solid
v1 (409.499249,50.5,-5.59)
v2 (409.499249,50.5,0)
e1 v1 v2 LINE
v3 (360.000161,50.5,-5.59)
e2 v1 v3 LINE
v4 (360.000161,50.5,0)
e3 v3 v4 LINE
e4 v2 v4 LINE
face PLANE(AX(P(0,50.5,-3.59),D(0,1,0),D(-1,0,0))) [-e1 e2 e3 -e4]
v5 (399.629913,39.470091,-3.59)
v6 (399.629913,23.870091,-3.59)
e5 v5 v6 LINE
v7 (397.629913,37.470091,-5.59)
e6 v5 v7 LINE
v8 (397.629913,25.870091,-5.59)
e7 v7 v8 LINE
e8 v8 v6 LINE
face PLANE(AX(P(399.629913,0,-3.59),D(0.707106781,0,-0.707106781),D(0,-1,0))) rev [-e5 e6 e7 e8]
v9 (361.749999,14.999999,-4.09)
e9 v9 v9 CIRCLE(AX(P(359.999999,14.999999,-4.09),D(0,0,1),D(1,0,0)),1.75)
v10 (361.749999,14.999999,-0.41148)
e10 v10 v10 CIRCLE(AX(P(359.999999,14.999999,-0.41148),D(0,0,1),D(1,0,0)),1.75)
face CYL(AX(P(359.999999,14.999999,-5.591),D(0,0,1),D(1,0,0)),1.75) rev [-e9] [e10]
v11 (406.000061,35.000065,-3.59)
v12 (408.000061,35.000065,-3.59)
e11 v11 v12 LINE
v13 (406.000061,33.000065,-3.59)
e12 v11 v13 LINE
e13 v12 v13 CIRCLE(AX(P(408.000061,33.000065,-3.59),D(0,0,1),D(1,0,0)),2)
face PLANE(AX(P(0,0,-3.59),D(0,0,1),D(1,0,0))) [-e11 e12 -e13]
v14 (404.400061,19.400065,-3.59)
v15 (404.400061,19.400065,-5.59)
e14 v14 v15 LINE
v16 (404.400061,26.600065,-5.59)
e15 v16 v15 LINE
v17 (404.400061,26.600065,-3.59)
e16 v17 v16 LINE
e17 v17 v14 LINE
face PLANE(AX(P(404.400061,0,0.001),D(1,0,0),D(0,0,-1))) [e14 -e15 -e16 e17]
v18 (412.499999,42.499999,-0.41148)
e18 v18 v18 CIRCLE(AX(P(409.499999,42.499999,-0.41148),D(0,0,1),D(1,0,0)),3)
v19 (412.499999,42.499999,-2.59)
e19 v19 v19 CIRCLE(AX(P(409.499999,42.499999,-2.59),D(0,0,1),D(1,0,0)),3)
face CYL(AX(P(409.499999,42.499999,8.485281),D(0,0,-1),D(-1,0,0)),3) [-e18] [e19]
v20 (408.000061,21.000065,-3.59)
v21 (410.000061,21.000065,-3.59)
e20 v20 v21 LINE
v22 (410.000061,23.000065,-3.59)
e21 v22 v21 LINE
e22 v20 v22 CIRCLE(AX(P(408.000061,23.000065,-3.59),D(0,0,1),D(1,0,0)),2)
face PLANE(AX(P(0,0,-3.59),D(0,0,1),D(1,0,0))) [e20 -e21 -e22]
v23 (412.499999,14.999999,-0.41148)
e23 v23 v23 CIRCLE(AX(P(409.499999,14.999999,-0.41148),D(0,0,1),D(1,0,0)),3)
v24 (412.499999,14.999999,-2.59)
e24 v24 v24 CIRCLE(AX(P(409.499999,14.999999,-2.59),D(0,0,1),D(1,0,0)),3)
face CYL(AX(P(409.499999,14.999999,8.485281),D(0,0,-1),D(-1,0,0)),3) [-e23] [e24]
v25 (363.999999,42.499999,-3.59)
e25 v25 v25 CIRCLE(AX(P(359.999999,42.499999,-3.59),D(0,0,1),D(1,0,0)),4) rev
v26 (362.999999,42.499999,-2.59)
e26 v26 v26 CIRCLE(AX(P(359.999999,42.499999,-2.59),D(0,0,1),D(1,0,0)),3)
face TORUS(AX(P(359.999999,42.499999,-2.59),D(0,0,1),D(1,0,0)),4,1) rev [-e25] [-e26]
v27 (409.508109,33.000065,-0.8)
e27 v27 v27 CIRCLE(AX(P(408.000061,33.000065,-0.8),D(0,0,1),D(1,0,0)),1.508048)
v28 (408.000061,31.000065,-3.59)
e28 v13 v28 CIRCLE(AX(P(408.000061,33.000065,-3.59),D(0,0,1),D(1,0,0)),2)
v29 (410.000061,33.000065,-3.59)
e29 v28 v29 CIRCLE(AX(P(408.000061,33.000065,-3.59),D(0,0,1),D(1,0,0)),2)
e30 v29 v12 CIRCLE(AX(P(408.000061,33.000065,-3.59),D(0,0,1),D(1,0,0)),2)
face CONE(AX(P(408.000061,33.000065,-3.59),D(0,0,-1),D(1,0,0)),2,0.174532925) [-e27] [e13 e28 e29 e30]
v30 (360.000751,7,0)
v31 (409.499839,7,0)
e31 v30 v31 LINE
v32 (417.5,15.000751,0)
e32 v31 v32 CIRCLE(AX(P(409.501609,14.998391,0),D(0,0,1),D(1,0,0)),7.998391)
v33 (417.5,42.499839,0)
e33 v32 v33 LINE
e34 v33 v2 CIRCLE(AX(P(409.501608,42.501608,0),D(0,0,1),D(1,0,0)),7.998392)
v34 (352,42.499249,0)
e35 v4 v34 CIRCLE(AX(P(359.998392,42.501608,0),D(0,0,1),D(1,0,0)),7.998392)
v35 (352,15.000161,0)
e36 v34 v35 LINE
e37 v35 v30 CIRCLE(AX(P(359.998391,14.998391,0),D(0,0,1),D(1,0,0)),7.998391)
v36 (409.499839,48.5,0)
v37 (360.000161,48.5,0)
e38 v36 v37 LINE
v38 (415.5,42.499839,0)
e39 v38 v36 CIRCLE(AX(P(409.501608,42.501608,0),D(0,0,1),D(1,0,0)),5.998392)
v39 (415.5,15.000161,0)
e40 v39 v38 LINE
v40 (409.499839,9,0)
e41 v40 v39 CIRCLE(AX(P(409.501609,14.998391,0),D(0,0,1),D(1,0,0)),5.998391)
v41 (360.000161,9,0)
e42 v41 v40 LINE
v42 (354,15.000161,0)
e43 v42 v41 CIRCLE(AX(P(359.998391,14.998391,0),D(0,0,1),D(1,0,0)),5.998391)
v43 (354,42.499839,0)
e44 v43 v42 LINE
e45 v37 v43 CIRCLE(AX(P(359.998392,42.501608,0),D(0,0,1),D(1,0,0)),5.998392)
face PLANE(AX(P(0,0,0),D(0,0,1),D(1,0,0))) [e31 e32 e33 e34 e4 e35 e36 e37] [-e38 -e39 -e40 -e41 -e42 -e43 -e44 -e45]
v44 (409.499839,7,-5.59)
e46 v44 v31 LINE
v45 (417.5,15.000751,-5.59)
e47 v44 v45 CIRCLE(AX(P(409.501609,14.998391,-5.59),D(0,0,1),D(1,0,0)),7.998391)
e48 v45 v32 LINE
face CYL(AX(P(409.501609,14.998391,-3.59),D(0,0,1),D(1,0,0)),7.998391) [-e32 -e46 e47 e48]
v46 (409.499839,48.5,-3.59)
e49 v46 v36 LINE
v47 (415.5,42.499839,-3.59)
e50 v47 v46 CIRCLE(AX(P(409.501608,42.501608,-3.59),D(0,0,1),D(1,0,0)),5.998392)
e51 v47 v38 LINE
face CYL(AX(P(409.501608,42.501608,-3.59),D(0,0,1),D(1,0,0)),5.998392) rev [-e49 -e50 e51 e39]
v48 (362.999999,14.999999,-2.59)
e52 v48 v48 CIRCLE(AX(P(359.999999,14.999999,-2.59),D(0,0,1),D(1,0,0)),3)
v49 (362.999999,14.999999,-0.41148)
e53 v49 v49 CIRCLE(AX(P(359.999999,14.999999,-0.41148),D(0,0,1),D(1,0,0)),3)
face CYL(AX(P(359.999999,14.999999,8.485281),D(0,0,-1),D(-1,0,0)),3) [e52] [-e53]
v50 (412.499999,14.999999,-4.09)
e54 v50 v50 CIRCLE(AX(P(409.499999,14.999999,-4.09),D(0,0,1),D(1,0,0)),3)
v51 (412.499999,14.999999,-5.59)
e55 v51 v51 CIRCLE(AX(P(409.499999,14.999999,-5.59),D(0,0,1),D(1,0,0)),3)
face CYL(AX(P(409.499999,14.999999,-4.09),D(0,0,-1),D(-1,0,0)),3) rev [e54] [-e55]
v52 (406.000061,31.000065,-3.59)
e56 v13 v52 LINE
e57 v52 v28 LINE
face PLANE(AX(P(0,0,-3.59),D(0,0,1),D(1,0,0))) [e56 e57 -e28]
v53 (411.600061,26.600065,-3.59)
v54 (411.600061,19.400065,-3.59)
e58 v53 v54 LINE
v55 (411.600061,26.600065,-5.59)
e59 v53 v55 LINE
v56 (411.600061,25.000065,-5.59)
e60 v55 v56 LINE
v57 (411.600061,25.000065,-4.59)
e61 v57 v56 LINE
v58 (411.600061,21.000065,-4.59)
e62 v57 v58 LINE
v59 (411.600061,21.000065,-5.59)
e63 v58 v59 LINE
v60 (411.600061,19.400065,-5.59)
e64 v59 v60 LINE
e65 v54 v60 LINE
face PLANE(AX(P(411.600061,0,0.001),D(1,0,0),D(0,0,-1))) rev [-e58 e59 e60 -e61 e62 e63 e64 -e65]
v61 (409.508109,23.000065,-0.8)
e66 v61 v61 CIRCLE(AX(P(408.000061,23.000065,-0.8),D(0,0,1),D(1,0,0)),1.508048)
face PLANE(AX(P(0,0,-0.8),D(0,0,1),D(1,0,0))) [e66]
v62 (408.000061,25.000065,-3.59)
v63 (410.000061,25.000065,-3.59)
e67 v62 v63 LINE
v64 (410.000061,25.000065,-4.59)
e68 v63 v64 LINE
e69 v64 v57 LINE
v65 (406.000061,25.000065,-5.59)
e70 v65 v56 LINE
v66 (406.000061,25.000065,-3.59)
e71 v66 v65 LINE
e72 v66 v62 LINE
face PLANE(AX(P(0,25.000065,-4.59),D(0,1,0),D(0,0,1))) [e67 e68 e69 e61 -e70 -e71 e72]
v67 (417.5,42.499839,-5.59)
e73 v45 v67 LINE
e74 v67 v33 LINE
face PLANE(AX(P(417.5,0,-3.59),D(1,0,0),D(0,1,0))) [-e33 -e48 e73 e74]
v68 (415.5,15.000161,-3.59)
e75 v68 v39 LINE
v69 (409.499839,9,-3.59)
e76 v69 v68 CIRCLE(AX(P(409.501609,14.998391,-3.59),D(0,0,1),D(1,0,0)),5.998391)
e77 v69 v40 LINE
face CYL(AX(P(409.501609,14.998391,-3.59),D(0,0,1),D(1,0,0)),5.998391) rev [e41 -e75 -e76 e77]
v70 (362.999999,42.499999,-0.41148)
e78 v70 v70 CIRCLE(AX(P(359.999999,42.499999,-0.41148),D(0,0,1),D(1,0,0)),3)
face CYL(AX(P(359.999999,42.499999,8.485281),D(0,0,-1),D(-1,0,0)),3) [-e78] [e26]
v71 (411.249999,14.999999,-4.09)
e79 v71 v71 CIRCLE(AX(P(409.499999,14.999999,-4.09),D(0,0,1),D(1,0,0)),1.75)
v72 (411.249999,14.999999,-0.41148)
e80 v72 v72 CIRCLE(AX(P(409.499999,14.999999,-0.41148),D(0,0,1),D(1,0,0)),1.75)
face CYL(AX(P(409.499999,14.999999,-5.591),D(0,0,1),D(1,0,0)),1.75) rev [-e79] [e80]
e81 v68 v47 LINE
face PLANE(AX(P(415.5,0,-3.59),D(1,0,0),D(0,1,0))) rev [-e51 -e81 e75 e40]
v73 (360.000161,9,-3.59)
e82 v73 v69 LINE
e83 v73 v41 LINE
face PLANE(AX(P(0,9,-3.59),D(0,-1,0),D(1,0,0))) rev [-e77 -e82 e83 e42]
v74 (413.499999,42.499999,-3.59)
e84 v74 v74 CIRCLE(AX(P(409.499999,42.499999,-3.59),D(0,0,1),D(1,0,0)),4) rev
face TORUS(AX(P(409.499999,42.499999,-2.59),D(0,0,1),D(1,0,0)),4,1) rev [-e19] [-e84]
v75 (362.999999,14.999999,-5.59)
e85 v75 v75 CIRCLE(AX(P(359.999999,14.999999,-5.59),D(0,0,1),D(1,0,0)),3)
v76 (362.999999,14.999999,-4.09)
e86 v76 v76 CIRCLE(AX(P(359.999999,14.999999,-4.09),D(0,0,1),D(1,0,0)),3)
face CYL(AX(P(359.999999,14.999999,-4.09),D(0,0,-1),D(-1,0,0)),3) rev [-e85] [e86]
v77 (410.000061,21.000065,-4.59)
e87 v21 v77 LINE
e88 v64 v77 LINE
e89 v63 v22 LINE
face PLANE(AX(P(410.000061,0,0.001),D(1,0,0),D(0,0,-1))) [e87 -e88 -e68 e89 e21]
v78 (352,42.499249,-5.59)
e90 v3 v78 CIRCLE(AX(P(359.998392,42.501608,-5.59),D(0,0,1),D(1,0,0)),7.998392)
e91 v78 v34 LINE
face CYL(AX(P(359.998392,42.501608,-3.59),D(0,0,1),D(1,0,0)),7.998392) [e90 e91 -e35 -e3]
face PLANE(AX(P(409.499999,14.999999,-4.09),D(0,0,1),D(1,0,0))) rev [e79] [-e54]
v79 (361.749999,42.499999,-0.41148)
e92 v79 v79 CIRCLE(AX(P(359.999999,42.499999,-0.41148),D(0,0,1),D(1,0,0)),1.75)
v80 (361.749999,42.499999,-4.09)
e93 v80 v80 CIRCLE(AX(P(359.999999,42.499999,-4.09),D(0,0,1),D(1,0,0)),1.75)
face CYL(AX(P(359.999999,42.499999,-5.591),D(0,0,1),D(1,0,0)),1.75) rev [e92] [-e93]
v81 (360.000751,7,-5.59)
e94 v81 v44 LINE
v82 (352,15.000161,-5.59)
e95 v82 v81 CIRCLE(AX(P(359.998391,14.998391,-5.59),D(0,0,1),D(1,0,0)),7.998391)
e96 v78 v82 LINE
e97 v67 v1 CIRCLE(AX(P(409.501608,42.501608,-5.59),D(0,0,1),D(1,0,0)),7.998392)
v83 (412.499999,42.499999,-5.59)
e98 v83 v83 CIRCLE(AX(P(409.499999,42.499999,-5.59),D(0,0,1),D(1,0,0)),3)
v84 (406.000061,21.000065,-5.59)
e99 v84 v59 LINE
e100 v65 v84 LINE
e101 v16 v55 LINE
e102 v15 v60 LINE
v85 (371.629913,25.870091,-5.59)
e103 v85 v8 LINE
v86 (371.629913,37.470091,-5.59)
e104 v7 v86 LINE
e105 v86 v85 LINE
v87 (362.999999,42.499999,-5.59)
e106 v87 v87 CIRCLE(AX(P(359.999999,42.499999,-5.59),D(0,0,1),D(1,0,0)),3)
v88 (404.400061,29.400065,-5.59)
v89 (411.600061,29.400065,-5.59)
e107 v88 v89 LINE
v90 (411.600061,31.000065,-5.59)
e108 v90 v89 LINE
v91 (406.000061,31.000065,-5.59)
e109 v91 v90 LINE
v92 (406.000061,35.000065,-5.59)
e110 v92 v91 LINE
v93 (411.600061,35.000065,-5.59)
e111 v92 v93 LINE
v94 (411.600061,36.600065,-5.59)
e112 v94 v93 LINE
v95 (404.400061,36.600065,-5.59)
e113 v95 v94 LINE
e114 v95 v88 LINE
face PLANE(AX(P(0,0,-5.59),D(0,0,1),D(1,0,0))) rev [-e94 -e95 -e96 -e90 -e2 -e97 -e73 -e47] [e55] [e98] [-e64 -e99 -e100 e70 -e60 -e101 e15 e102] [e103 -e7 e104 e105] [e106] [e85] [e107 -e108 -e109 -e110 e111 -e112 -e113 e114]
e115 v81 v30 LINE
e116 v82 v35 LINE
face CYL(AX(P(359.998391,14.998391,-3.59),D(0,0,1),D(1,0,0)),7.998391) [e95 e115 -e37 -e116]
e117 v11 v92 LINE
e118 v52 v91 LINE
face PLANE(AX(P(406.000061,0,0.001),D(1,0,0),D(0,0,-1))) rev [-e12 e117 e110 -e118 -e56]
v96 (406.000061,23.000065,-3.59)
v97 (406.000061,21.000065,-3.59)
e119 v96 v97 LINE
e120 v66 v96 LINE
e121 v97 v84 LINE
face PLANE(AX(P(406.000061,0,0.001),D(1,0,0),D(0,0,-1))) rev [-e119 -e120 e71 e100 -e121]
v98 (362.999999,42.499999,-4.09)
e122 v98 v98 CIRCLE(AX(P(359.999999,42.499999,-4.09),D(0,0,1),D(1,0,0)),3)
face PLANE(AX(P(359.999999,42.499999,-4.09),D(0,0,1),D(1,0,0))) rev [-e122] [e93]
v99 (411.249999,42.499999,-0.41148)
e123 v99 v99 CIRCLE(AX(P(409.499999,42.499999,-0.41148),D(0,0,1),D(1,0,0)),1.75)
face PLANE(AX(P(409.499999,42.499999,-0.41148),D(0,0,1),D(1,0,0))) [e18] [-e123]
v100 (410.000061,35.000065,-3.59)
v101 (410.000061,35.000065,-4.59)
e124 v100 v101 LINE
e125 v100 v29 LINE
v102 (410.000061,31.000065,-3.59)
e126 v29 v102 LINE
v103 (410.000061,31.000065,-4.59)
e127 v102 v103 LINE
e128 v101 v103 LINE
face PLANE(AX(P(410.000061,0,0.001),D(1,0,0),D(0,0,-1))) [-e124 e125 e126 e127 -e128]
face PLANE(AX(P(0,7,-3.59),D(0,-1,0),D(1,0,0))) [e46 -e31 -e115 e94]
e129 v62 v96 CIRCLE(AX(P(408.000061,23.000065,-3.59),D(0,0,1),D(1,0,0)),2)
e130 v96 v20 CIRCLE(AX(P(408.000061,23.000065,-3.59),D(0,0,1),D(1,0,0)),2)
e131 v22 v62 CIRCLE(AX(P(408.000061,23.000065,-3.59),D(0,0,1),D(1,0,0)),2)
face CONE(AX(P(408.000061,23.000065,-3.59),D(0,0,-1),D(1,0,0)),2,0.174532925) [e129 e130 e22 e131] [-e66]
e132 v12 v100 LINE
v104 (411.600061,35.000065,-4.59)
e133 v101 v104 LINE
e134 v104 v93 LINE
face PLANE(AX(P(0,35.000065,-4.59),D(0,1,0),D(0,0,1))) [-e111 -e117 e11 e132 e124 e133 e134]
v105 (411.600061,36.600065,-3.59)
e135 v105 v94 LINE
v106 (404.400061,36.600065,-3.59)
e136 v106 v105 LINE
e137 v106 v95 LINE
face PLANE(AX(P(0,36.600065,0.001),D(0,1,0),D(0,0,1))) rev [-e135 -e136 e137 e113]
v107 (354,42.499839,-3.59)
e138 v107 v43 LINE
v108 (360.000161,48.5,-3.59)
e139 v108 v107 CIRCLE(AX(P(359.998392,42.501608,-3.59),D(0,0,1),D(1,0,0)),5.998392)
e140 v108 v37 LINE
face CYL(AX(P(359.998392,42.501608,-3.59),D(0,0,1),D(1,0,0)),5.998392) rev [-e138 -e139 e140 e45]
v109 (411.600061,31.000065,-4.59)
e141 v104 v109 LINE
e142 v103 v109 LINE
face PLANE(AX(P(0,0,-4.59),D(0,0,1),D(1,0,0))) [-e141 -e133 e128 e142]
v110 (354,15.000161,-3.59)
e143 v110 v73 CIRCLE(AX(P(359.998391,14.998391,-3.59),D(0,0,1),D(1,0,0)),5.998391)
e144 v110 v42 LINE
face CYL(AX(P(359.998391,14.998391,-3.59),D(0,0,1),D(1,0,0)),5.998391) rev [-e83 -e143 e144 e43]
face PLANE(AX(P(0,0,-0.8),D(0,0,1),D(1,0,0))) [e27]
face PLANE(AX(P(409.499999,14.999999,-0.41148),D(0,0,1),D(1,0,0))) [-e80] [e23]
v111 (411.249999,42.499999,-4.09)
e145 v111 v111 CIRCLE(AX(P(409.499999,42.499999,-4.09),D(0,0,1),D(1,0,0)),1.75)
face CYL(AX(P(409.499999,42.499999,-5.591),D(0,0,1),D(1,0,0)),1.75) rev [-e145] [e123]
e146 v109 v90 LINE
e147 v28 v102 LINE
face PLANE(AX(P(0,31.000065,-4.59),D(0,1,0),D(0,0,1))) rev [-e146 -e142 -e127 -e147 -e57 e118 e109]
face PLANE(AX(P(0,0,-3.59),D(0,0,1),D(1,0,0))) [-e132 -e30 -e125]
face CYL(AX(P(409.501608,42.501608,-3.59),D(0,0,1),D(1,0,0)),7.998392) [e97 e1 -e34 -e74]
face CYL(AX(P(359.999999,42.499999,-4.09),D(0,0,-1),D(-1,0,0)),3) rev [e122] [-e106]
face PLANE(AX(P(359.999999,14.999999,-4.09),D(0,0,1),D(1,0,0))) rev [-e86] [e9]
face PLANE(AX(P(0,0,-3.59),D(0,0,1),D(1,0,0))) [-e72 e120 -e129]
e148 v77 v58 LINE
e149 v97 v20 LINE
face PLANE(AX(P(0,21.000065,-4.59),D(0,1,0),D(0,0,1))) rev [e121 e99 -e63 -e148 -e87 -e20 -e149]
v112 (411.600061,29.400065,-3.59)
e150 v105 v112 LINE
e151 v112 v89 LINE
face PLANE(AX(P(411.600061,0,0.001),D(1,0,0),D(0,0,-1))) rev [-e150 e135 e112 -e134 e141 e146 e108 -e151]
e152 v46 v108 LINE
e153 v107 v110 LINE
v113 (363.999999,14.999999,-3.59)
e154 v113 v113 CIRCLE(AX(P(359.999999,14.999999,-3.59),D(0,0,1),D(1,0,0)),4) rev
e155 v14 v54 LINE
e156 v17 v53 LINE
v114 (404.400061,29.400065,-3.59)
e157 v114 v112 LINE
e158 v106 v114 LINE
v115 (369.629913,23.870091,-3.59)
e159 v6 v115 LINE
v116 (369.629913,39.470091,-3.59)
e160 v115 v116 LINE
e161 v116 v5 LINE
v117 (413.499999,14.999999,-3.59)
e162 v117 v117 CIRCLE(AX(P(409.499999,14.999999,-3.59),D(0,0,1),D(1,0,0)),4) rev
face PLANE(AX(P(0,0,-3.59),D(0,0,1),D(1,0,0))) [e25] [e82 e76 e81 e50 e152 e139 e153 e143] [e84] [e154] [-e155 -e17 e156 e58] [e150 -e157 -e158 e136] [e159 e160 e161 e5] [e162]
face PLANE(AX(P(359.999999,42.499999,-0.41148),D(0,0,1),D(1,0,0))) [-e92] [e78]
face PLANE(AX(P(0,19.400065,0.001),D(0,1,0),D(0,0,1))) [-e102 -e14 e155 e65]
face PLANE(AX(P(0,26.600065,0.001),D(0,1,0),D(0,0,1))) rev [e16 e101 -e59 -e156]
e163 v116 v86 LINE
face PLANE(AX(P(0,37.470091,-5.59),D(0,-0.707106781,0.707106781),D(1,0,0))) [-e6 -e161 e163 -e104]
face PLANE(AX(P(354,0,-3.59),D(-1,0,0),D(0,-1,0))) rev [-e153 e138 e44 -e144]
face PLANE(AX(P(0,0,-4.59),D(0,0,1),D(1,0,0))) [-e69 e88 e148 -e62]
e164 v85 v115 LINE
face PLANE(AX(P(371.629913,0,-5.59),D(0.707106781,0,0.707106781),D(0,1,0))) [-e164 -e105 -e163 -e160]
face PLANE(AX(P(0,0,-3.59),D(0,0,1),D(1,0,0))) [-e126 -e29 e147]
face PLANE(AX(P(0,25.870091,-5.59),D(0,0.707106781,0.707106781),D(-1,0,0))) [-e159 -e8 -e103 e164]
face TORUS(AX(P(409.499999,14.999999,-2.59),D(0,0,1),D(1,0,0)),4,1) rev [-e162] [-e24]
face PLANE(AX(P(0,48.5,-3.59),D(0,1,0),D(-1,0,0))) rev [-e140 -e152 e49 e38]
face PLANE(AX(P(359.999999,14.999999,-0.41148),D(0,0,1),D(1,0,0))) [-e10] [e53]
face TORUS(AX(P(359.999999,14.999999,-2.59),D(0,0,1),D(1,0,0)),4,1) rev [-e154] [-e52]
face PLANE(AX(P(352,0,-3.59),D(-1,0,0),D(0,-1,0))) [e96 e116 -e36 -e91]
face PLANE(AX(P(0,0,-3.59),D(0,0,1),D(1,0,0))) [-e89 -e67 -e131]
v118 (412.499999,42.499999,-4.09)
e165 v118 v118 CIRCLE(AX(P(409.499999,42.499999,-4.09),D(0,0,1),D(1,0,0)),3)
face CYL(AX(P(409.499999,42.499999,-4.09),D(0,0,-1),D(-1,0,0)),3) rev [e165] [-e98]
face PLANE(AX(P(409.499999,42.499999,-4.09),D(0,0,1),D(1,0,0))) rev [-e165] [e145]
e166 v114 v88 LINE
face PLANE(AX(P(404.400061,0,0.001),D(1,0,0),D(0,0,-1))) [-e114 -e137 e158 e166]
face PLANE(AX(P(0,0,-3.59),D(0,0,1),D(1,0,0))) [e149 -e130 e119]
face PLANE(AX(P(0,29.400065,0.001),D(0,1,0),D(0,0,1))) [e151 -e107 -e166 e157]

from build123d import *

# Parameters (mm, degrees)
BOSS_EXTRUDE1_DEPTH       = 3.59
SHELL1_T                  = 2
CUT_EXTRUDE2_START        = -3.59
SKETCH6_W                 = 26
SKETCH6_H                 = 11.6
CUT_EXTRUDE2_DEPTH        = 417.990251938
CUT_EXTRUDE3_REACH        = 422.58
SKETCH4_R                 = 1.75
BOSS_EXTRUDE2_START       = -0.8
SKETCH4_3_R               = 3
SKETCH4_3_R_2             = 1.75
BOSS_EXTRUDE2_DEPTH       = 4.79
BOSS_EXTRUDE3_START       = -0.41148
SKETCH4_4_R               = 3
SKETCH4_4_R_2             = 1.75
BOSS_EXTRUDE3_DEPTH       = 5.17852
CHAMFER1_SIZE             = 2
CUT_EXTRUDE4_START        = -5.59
CUT_EXTRUDE4_DEPTH        = 2
BOSS_EXTRUDE4_START       = -5.59
BOSS_EXTRUDE4_DEPTH       = 1
BOSS_EXTRUDE5_OUTLINE_R   = 1.508047724
BOSS_EXTRUDE5_DEPTH       = 2.79
BOSS_EXTRUDE5_DRAFT       = 10
BOSS_EXTRUDE5_2_OUTLINE_R = 1.508047724
BOSS_EXTRUDE5_2_DEPTH     = 2.79
BOSS_EXTRUDE5_2_DRAFT     = 10
CUT_EXTRUDE7_START        = -5.59
SKETCH4_5_R               = 3
CUT_EXTRUDE7_DEPTH        = 1.5
FILLET2_R                 = 1


# Read off the part's stored shape, not the designer's step: Boss-Extrude5
with BuildPart() as part:
    # Sketch3 → Boss-Extrude1 (new body)
    # profile 1 of 2: a face of its own
    with BuildSketch(Plane.XY):
        with BuildLine():
            Line((409.499839162, 48.499999974), (360.000160838, 48.499999974))
            ThreePointArc((360.000160838, 48.499999974), (355.756888215, 46.743111785), (354.000000026, 42.499839162))
            Line((354.000000026, 42.499839162), (354.000000026, 15.000161001))
            ThreePointArc((354.000000026, 15.000161001), (355.756887739, 10.756887739), (360.000161001, 9.000000026))
            Line((360.000161001, 9.000000026), (409.499838999, 9.000000026))
            ThreePointArc((409.499838999, 9.000000026), (413.743112261, 10.756887739), (415.499999974, 15.000161001))
            Line((415.499999974, 15.000161001), (415.499999974, 42.499839162))
            ThreePointArc((415.499999974, 42.499839162), (413.743111785, 46.743111785), (409.499839162, 48.499999974))
        make_face()
        with BuildLine():
            ThreePointArc((360, 47.5), (356.46399498, 46.03600502), (355, 42.5))
            Line((355, 42.5), (355, 15))
            ThreePointArc((355, 15), (356.463994503, 11.463994503), (360, 10))
            Line((360, 10), (409.5, 10))
            ThreePointArc((409.5, 10), (413.036005497, 11.463994503), (414.5, 15))
            Line((414.5, 15), (414.5, 42.5))
            ThreePointArc((414.5, 42.5), (413.03600502, 46.03600502), (409.5, 47.5))
            Line((409.5, 47.5), (360, 47.5))
        make_face(mode=Mode.SUBTRACT)
    # profile 2 of 2: a face of its own
    with BuildSketch(Plane.XY):
        with BuildLine():
            Line((409.5, 47.5), (360, 47.5))
            ThreePointArc((360, 47.5), (356.46399498, 46.03600502), (355, 42.5))
            Line((355, 42.5), (355, 15))
            ThreePointArc((355, 15), (356.463994503, 11.463994503), (360, 10))
            Line((360, 10), (409.5, 10))
            ThreePointArc((409.5, 10), (413.036005497, 11.463994503), (414.5, 15))
            Line((414.5, 15), (414.5, 42.5))
            ThreePointArc((414.5, 42.5), (413.03600502, 46.03600502), (409.5, 47.5))
        make_face()
    extrude(amount=-BOSS_EXTRUDE1_DEPTH)

    # Shell1
    shell1_openings = [part.faces().sort_by_distance(p)[0] for p in [
        (384.75, 28.749999938, 0),
    ]]
    offset(amount=SHELL1_T, openings=shell1_openings, kind=Kind.INTERSECTION)

    # Sketch6 → Cut-Extrude2 (cut, through all)
    with BuildSketch(Plane.XY.offset(CUT_EXTRUDE2_START)):
        with Locations((384.62991333, 31.670090703)):
            Rectangle(SKETCH6_W, SKETCH6_H)
    extrude(amount=-CUT_EXTRUDE2_DEPTH, mode=Mode.SUBTRACT)

    # Sketch4 → Cut-Extrude3 (cut, up to next)
    with BuildSketch(Plane.XY, mode=Mode.PRIVATE) as cut_extrude3_sk1:
        with Locations((409.49999888, 42.49999882)):
            Circle(SKETCH4_R)
    cut_extrude3_tool1 = extrude(cut_extrude3_sk1.sketch, amount=-CUT_EXTRUDE3_REACH, mode=Mode.PRIVATE) & part.part
    # Sketch4 → Cut-Extrude3 (cut, up to next)
    with BuildSketch(Plane.XY, mode=Mode.PRIVATE) as cut_extrude3_sk2:
        with Locations((359.99999888, 42.49999882)):
            Circle(SKETCH4_R)
    cut_extrude3_tool2 = extrude(cut_extrude3_sk2.sketch, amount=-CUT_EXTRUDE3_REACH, mode=Mode.PRIVATE) & part.part
    # Sketch4 → Cut-Extrude3 (cut, up to next)
    with BuildSketch(Plane.XY, mode=Mode.PRIVATE) as cut_extrude3_sk3:
        with Locations((359.99999888, 14.99999882)):
            Circle(SKETCH4_R)
    cut_extrude3_tool3 = extrude(cut_extrude3_sk3.sketch, amount=-CUT_EXTRUDE3_REACH, mode=Mode.PRIVATE) & part.part
    # Sketch4 → Cut-Extrude3 (cut, up to next)
    with BuildSketch(Plane.XY, mode=Mode.PRIVATE) as cut_extrude3_sk4:
        with Locations((409.49999888, 14.99999882)):
            Circle(SKETCH4_R)
    cut_extrude3_tool4 = extrude(cut_extrude3_sk4.sketch, amount=-CUT_EXTRUDE3_REACH, mode=Mode.PRIVATE) & part.part
    add(cut_extrude3_tool1.solids().sort_by_distance((409.499999, 42.499999, 0))[0], mode=Mode.SUBTRACT)
    add(cut_extrude3_tool2.solids().sort_by_distance((359.999999, 42.499999, 0))[0], mode=Mode.SUBTRACT)
    add(cut_extrude3_tool3.solids().sort_by_distance((359.999999, 14.999999, 0))[0], mode=Mode.SUBTRACT)
    add(cut_extrude3_tool4.solids().sort_by_distance((409.499999, 14.999999, 0))[0], mode=Mode.SUBTRACT)

    # Sketch4<3> → Boss-Extrude2 (add)
    # profile 1 of 4: a face of its own
    with BuildSketch(Plane.XY.offset(BOSS_EXTRUDE2_START)):
        with Locations((409.49999888, 42.49999882)):
            Circle(SKETCH4_3_R)
        with Locations((409.49999888, 42.49999882)):
            Circle(SKETCH4_3_R_2, mode=Mode.SUBTRACT)
    # profile 2 of 4: a face of its own
    with BuildSketch(Plane.XY.offset(BOSS_EXTRUDE2_START)):
        with Locations((359.99999888, 42.49999882)):
            Circle(SKETCH4_3_R)
        with Locations((359.99999888, 42.49999882)):
            Circle(SKETCH4_3_R_2, mode=Mode.SUBTRACT)
    # profile 3 of 4: a face of its own
    with BuildSketch(Plane.XY.offset(BOSS_EXTRUDE2_START)):
        with Locations((359.99999888, 14.99999882)):
            Circle(SKETCH4_3_R)
        with Locations((359.99999888, 14.99999882)):
            Circle(SKETCH4_3_R_2, mode=Mode.SUBTRACT)
    # profile 4 of 4: a face of its own
    with BuildSketch(Plane.XY.offset(BOSS_EXTRUDE2_START)):
        with Locations((409.49999888, 14.99999882)):
            Circle(SKETCH4_3_R)
        with Locations((409.49999888, 14.99999882)):
            Circle(SKETCH4_3_R_2, mode=Mode.SUBTRACT)
    extrude(amount=-BOSS_EXTRUDE2_DEPTH)

    # Sketch4<4> → Boss-Extrude3 (add)
    # profile 1 of 4: a face of its own
    with BuildSketch(Plane.XY.offset(BOSS_EXTRUDE3_START)):
        with Locations((409.49999888, 42.49999882)):
            Circle(SKETCH4_4_R)
        with Locations((409.49999888, 42.49999882)):
            Circle(SKETCH4_4_R_2, mode=Mode.SUBTRACT)
    # profile 2 of 4: a face of its own
    with BuildSketch(Plane.XY.offset(BOSS_EXTRUDE3_START)):
        with Locations((359.99999888, 42.49999882)):
            Circle(SKETCH4_4_R)
        with Locations((359.99999888, 42.49999882)):
            Circle(SKETCH4_4_R_2, mode=Mode.SUBTRACT)
    # profile 3 of 4: a face of its own
    with BuildSketch(Plane.XY.offset(BOSS_EXTRUDE3_START)):
        with Locations((359.99999888, 14.99999882)):
            Circle(SKETCH4_4_R)
        with Locations((359.99999888, 14.99999882)):
            Circle(SKETCH4_4_R_2, mode=Mode.SUBTRACT)
    # profile 4 of 4: a face of its own
    with BuildSketch(Plane.XY.offset(BOSS_EXTRUDE3_START)):
        with Locations((409.49999888, 14.99999882)):
            Circle(SKETCH4_4_R)
        with Locations((409.49999888, 14.99999882)):
            Circle(SKETCH4_4_R_2, mode=Mode.SUBTRACT)
    extrude(amount=-BOSS_EXTRUDE3_DEPTH)

    # Chamfer1
    chamfer1_edges = [part.edges().sort_by_distance(p)[0] for p in [
        (371.62991333, 31.670090703, -3.59),
        (384.62991333, 37.470090703, -3.59),
        (397.62991333, 31.670090703, -3.59),
        (384.62991333, 25.870090703, -3.59),
    ]]
    chamfer(chamfer1_edges, length=CHAMFER1_SIZE - 0.0001)  # a hair under: the kernel refuses the full size

    # Sketch8 → Cut-Extrude4 (cut)
    with BuildSketch(Plane.XY.offset(CUT_EXTRUDE4_START)):
        Polygon((404.400061047, 26.600064968), (404.400061047, 19.400064968), (411.600061047, 19.400064968), (411.600061047, 21.000064968), (410.000061047, 21.000064968), (408.000061047, 21.000064968), (406.000061047, 21.000064968), (406.000061047, 23.000064968), (406.000061047, 25.000064968), (408.000061047, 25.000064968), (410.000061047, 25.000064968), (411.600061047, 25.000064968), (411.600061047, 26.600064968), align=None)
        Polygon((406.000061047, 33.000064968), (406.000061047, 35.000064968), (408.000061047, 35.000064968), (410.000061047, 35.000064968), (411.600061047, 35.000064968), (411.600061047, 36.600064968), (404.400061047, 36.600064968), (404.400061047, 29.400064968), (411.600061047, 29.400064968), (411.600061047, 31.000064968), (410.000061047, 31.000064968), (408.000061047, 31.000064968), (406.000061047, 31.000064968), align=None)
        Polygon((411.600061047, 35.000064968), (410.000061047, 35.000064968), (410.000061047, 33.000064968), (410.000061047, 31.000064968), (411.600061047, 31.000064968), align=None)
        Polygon((410.000061047, 21.000064968), (411.600061047, 21.000064968), (411.600061047, 25.000064968), (410.000061047, 25.000064968), (410.000061047, 23.000064968), align=None)
    extrude(amount=CUT_EXTRUDE4_DEPTH, mode=Mode.SUBTRACT)


with BuildPart() as cut_extrude4_piece_1:
    # of the separate pieces the step leaves, piece 1, a body of its own (cut_extrude4_pieces)
    add(part.part.solids().sort_by_distance((409.499839162, 48.499999974, -3.59))[0])



with BuildPart() as cut_extrude4_piece_2:
    # of the separate pieces the step leaves, piece 2, a body of its own (cut_extrude4_pieces)
    add(part.part.solids().sort_by_distance((410.000061047, 35.000064968, -3.59))[0])


with BuildPart() as cut_extrude4_piece_3:
    # of the separate pieces the step leaves, piece 3, a body of its own (cut_extrude4_pieces)
    add(part.part.solids().sort_by_distance((406.000061047, 25.000064968, -3.59))[0])


with BuildPart() as cut_extrude4_piece_1_1:
    add(cut_extrude4_piece_1.part)

    add(cut_extrude4_piece_2.part)  # Boss-Extrude4 merges Cut-Extrude4 piece 2

    add(cut_extrude4_piece_3.part)  # Boss-Extrude4 merges Cut-Extrude4 piece 3
    # Sketch8<3> → Boss-Extrude4 (add)
    with BuildSketch(Plane.XY.offset(BOSS_EXTRUDE4_START)):
        Polygon((411.600061047, 35.000064968), (410.000061047, 35.000064968), (410.000061047, 33.000064968), (410.000061047, 31.000064968), (411.600061047, 31.000064968), align=None)
        Polygon((410.000061047, 21.000064968), (411.600061047, 21.000064968), (411.600061047, 25.000064968), (410.000061047, 25.000064968), (410.000061047, 23.000064968), align=None)
    extrude(amount=BOSS_EXTRUDE4_DEPTH)


with BuildPart() as boss_extrude5_tool:
    # Boss-Extrude5 outline → Boss-Extrude5 (with draft: the straight prism first)
    with BuildSketch(Plane.XY.offset(-0.8)):
        with Locations((408.000061047, 33.000064968)):
            Circle(BOSS_EXTRUDE5_OUTLINE_R)
    extrude(amount=-BOSS_EXTRUDE5_DEPTH)
    # Boss-Extrude5: the draft: its side faces are tilted about the plane it starts from
    boss_extrude5_sides = [boss_extrude5_tool.faces().sort_by_distance(p)[0] for p in [
        (406.492013323, 33.000064968, -2.195),
    ]]
    draft(boss_extrude5_sides, Plane.XY.offset(-0.8), BOSS_EXTRUDE5_DRAFT)


with BuildPart() as cut_extrude4_piece_1_2:
    add(cut_extrude4_piece_1_1.part)

    # Boss-Extrude5: add boss_extrude5_tool
    add(boss_extrude5_tool.part)


with BuildPart() as boss_extrude5_2_tool:
    # Boss-Extrude5 2 outline → Boss-Extrude5 2 (with draft: the straight prism first)
    with BuildSketch(Plane.XY.offset(-0.8)):
        with Locations((408.000061047, 23.000064968)):
            Circle(BOSS_EXTRUDE5_2_OUTLINE_R)
    extrude(amount=-BOSS_EXTRUDE5_2_DEPTH)
    # Boss-Extrude5 2: the draft: its side faces are tilted about the plane it starts from
    boss_extrude5_2_sides = [boss_extrude5_2_tool.faces().sort_by_distance(p)[0] for p in [
        (406.492013323, 23.000064968, -2.195),
    ]]
    draft(boss_extrude5_2_sides, Plane.XY.offset(-0.8), BOSS_EXTRUDE5_2_DRAFT)


with BuildPart() as cut_extrude4_piece_1_3:
    add(cut_extrude4_piece_1_2.part)

    # Boss-Extrude5 2: add boss_extrude5_2_tool
    add(boss_extrude5_2_tool.part)

    # Sketch4<5> → Cut-Extrude7 (cut)
    with BuildSketch(Plane.XY.offset(CUT_EXTRUDE7_START)):
        with Locations((409.49999888, 42.49999882)):
            Circle(SKETCH4_5_R)
        with Locations((359.99999888, 42.49999882)):
            Circle(SKETCH4_5_R)
        with Locations((359.99999888, 14.99999882)):
            Circle(SKETCH4_5_R)
        with Locations((409.49999888, 14.99999882)):
            Circle(SKETCH4_5_R)
    extrude(amount=CUT_EXTRUDE7_DEPTH, mode=Mode.SUBTRACT)

    # Fillet2
    fillet2_edges = [cut_extrude4_piece_1_3.edges().sort_by_distance(p)[0] for p in [
        (356.99999888, 14.99999882, -3.59),
        (406.49999888, 42.49999882, -3.59),
        (356.99999888, 42.49999882, -3.59),
        (406.49999888, 14.99999882, -3.59),
    ]]
    fillet(fillet2_edges, radius=FILLET2_R)


solid = cut_extrude4_piece_1_3.part
